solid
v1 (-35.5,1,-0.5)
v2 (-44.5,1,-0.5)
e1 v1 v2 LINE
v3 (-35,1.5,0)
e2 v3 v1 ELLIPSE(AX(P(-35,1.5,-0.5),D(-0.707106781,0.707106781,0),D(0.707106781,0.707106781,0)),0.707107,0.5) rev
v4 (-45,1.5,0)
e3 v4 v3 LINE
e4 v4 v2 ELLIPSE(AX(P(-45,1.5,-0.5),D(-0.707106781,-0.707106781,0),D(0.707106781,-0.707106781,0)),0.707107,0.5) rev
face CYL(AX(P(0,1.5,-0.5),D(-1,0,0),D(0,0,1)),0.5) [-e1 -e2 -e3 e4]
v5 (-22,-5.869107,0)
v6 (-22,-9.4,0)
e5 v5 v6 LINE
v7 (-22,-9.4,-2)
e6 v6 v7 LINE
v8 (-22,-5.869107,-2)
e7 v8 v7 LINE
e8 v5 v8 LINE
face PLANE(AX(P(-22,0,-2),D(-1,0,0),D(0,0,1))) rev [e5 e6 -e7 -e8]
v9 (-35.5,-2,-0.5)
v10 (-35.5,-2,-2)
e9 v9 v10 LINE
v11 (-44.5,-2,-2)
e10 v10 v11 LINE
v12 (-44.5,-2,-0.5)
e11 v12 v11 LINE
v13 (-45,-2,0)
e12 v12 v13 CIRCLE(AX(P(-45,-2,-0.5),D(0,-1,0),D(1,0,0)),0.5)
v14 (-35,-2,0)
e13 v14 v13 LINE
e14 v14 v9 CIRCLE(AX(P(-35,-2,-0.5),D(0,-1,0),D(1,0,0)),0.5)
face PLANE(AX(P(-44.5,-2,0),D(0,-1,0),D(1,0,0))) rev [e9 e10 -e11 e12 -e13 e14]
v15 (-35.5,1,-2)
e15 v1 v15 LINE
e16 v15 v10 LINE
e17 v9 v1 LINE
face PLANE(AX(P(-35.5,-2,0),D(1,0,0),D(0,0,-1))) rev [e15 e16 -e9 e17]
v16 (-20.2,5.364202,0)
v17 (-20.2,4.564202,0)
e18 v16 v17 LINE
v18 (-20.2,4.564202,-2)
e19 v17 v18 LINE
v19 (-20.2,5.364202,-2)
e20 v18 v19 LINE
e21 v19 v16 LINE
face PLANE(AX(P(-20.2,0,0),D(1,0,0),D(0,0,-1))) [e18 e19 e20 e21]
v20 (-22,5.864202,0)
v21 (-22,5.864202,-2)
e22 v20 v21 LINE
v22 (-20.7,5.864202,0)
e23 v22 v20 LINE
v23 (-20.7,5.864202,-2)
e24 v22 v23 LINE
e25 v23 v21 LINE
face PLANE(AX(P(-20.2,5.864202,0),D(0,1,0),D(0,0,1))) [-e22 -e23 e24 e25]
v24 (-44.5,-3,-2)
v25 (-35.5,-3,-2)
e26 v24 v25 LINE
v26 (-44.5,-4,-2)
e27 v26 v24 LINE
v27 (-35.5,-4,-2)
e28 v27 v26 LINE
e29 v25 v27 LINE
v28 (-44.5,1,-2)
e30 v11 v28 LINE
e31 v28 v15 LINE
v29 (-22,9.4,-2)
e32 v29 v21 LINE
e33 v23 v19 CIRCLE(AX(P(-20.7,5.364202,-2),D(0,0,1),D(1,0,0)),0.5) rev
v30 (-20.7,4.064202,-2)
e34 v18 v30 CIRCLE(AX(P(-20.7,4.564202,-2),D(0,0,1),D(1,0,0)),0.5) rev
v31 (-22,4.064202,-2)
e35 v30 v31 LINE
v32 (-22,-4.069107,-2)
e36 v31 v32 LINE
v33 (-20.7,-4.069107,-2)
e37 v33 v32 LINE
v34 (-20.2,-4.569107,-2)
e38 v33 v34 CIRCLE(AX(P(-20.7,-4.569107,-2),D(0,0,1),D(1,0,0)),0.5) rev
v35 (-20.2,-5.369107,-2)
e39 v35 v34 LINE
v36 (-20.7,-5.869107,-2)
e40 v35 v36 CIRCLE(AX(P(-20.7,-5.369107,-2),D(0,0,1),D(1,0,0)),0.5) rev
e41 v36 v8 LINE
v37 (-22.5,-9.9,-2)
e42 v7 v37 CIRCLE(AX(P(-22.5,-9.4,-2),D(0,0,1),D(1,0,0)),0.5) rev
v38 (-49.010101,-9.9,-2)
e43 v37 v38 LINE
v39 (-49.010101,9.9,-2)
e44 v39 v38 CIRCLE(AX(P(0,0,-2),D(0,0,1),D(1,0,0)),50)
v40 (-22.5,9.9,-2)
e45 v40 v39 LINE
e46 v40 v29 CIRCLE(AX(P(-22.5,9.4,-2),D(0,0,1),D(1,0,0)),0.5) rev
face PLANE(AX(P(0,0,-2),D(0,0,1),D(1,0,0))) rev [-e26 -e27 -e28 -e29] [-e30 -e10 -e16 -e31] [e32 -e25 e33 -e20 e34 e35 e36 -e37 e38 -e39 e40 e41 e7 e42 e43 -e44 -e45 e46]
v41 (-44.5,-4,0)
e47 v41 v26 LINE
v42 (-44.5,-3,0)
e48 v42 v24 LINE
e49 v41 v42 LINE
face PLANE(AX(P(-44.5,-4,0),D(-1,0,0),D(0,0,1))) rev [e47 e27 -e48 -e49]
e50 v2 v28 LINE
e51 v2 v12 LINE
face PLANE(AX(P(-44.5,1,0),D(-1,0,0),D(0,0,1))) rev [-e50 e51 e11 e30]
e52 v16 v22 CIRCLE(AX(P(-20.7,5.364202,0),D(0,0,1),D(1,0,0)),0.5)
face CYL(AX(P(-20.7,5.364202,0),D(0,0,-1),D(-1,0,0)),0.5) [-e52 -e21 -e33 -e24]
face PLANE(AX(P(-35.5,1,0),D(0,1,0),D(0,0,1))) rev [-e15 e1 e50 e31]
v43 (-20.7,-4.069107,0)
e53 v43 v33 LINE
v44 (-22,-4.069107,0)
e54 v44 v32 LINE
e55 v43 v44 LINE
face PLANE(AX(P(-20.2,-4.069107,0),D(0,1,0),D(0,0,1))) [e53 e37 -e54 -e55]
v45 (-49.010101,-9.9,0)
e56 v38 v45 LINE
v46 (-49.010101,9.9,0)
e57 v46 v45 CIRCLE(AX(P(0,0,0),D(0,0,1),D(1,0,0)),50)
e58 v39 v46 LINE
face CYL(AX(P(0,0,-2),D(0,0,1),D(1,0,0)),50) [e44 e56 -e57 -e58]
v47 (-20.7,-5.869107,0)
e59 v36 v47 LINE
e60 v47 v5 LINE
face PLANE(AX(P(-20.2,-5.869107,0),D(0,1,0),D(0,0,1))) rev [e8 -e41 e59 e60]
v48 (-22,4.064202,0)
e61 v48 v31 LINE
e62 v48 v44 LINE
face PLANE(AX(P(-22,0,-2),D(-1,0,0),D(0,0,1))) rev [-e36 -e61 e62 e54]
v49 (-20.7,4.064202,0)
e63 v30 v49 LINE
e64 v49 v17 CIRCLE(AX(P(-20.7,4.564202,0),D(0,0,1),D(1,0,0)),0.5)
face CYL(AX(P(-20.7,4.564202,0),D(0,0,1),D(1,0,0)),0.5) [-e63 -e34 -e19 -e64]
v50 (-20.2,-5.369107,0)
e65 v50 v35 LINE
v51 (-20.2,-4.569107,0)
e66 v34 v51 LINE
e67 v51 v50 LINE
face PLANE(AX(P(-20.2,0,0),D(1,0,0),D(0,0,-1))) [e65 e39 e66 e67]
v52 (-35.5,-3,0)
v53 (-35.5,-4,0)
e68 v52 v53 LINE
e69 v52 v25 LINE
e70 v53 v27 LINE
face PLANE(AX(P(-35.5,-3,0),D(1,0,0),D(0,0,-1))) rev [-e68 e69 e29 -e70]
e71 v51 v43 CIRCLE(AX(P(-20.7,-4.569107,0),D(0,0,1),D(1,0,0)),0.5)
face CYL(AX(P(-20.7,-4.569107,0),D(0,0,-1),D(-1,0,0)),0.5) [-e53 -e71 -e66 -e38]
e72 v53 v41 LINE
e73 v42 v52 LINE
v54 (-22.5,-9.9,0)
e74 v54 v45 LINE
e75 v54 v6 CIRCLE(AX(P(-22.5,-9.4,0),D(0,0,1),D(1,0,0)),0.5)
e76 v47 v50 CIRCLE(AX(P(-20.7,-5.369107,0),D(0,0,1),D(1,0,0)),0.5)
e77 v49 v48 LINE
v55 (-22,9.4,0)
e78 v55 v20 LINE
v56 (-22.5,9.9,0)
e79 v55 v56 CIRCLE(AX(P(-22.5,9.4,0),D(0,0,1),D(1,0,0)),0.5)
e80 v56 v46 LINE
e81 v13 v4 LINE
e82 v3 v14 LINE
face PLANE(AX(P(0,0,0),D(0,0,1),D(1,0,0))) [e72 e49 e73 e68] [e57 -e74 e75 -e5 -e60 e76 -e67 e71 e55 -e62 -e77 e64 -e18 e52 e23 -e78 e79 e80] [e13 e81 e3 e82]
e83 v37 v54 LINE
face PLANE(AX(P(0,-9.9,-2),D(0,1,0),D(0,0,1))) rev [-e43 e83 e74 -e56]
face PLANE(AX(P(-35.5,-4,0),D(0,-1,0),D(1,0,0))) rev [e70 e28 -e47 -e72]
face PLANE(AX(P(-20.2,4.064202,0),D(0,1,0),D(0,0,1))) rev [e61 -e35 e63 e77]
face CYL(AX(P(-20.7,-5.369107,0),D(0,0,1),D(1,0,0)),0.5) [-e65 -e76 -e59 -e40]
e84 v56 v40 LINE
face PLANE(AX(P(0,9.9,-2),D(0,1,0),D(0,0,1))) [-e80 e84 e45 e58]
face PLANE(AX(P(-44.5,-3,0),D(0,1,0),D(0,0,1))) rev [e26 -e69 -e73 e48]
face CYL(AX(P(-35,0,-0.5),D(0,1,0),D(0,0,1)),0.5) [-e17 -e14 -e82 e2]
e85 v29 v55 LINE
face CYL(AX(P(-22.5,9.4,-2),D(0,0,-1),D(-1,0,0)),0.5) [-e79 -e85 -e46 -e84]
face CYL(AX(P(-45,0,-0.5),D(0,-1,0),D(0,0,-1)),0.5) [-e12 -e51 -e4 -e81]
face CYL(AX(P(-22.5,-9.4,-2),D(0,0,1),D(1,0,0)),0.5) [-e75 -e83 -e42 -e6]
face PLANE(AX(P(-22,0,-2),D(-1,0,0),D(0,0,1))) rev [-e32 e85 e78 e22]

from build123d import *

# Parameters (mm, degrees)
SKETCH1_R           = 50
BOSS_EXTRUDE1_DEPTH = 2
SKETCH1_3_W         = 9
SKETCH1_3_H         = 4
BOSS_EXTRUDE2_DEPTH = 5
CUT_EXTRUDE1_DEPTH  = 9
SKETCH5_W           = 24
SKETCH5_H           = 2
BOSS_EXTRUDE3_DEPTH = 2.5
CUT_EXTRUDE7_DEPTH  = 2
SKETCH8_W           = 33
SKETCH8_H           = 2
BOSS_EXTRUDE4_DEPTH = 2.5
SKETCH13_W          = 24
SKETCH13_H          = 2.5
CUT_EXTRUDE10_DEPTH = 4
SKETCH1_9_R         = 10
CUT_EXTRUDE17_DEPTH = 2
CHAMFER2_SIZE       = 4.5
CHAMFER2_SIZE_2     = 3.150933922
CUT_EXTRUDE19_DEPTH = 9
SKETCH15_W          = 9
SKETCH15_H          = 3
SKETCH15_H_2        = 1
CUT_EXTRUDE20_DEPTH = 2
BOSS_EXTRUDE6_DEPTH = 1.8
FILLET4_R           = 0.5


with BuildPart() as part:
    # Sketch1 → Boss-Extrude1 (new body)
    with BuildSketch(Plane.XY):
        Circle(SKETCH1_R)
    extrude(amount=-BOSS_EXTRUDE1_DEPTH)

    # Sketch1<3> → Boss-Extrude2 (add)
    with BuildSketch(Plane.XY):
        with Locations((-40, 0)):
            Rectangle(SKETCH1_3_W, SKETCH1_3_H)
    extrude(amount=BOSS_EXTRUDE2_DEPTH)

    # Sketch4 → Cut-Extrude1 (cut)
    with BuildSketch(Plane.ZY.offset(44.5)):
        Polygon((0, 0), (2.5, 0), (2.5, -2), (5, -2), (5, 2), (0, 2), align=None)
        Polygon((0, 0), (0, -2), (2.5, 0), align=None)
    extrude(amount=-CUT_EXTRUDE1_DEPTH, mode=Mode.SUBTRACT)


with BuildPart() as cut_extrude1_piece_1:
    # of the separate pieces the step leaves, piece 1, a body of its own (cut_extrude1_pieces)
    add(part.part.solids().sort_by_distance((50, 0, 0))[0])

    # Sketch5 → Boss-Extrude3 (add)
    with BuildSketch(Plane.XY):
        with Locations((-23.5, -1)):
            Rectangle(SKETCH5_W, SKETCH5_H)
    extrude(amount=BOSS_EXTRUDE3_DEPTH)

    # Sketch1<4> → Cut-Extrude7 (cut)
    with BuildSketch(Plane.XY):
        with BuildLine():
            Line((10, 0), (0, 0))
            Line((0, 0), (-10, 0))
            ThreePointArc((-10, 0), (0, -10), (10, 0))
        make_face()
        with BuildLine():
            Line((-10, 0), (0, 0))
            Line((0, 0), (10, 0))
            ThreePointArc((10, 0), (0, 10), (-10, 0))
        make_face()
        with BuildLine():
            Line((10, 0), (0, 0))
            Line((0, 0), (-10, 0))
            ThreePointArc((-10, 0), (0, -10), (10, 0))
        make_face()
        with BuildLine():
            Line((-10, 0), (0, 0))
            Line((0, 0), (10, 0))
            ThreePointArc((10, 0), (0, 10), (-10, 0))
        make_face()
    extrude(amount=-CUT_EXTRUDE7_DEPTH, mode=Mode.SUBTRACT)



with BuildPart() as cut_extrude1_piece_2:
    # of the separate pieces the step leaves, piece 2, a body of its own (cut_extrude1_pieces)
    add(part.part.solids().sort_by_distance((-44.5, -2, 2.5))[0])


with BuildPart() as cut_extrude1_piece_1_1:
    add(cut_extrude1_piece_1.part)

    add(cut_extrude1_piece_2.part)  # Boss-Extrude4 merges Cut-Extrude1 piece 2
    # Sketch8 → Boss-Extrude4 (add)
    with BuildSketch(Plane.XY):
        with Locations((-28, -3)):
            Rectangle(SKETCH8_W, SKETCH8_H)
    extrude(amount=BOSS_EXTRUDE4_DEPTH)

    # Sketch13 → Cut-Extrude10 (cut)
    with BuildSketch(Plane(origin=(0, 0, 0), x_dir=(1, 0, 0), z_dir=(0, 1, 0))):
        with Locations((-23.5, -1.25)):
            Rectangle(SKETCH13_W, SKETCH13_H)
    extrude(amount=-CUT_EXTRUDE10_DEPTH, mode=Mode.SUBTRACT)

    # Sketch1<9> → Cut-Extrude17 (cut)
    with BuildSketch(Plane.XY):
        with BuildLine():
            Line((-22, 9.9), (-22, -9.9))
            Line((-22, -9.9), (-49.010101, -9.9))
            ThreePointArc((-49.010101, -9.9), (50, 0), (-49.010101, 9.9))
            Line((-49.010101, 9.9), (-22, 9.9))
        make_face()
        Circle(SKETCH1_9_R, mode=Mode.SUBTRACT)
    extrude(amount=-CUT_EXTRUDE17_DEPTH, mode=Mode.SUBTRACT)

    # Chamfer2
    # the kernel refuses this chamfer: 4.5, 3.150933922 mm, written as the material it takes off along each edge
    with BuildSketch(Plane(origin=(-35.5, -9.259884147, -9.074855184), x_dir=(-0.9997533347641299, 0.017342841849466925, -0.013874273479573545), z_dir=(0, 0.6246950475544244, 0.7808688094430303))) as chamfer2_piece_1_section:
        Polygon((CHAMFER2_SIZE * 0.999753334764, CHAMFER2_SIZE * 0.0222096741985), (-CHAMFER2_SIZE_2 * 0.0222096741981, CHAMFER2_SIZE_2 * 0.999753334746), (0, 0), align=None)
    chamfer2_piece_1 = extrude(amount=26.444532191, mode=Mode.PRIVATE)
    chamfer2_piece_1 = split(chamfer2_piece_1, bisect_by=Plane(origin=(-37.088065075, -2.140732647, 0), z_dir=(0, 0, 1)), keep=Keep.TOP, mode=Mode.PRIVATE)
    add(chamfer2_piece_1, mode=Mode.SUBTRACT)

    # Sketch17 → Cut-Extrude19 (cut)
    with BuildSketch(Plane.ZY.offset(44.5)):
        Polygon((0, -4), (2.5, -4), (2.5, 0), (0, -2), align=None)
    extrude(amount=-CUT_EXTRUDE19_DEPTH, mode=Mode.SUBTRACT)

    # Sketch15 → Cut-Extrude20 (cut)
    with BuildSketch(Plane(origin=(0, 0, -2), x_dir=(-1, 0, 0), z_dir=(0, 0, -1))):
        with Locations((40, -0.5)):
            Rectangle(SKETCH15_W, SKETCH15_H)
        with Locations((40, -3.5)):
            Rectangle(SKETCH15_W, SKETCH15_H_2)
    extrude(amount=-CUT_EXTRUDE20_DEPTH, mode=Mode.SUBTRACT)

    # Sketch18 → Boss-Extrude6 (add)
    with BuildSketch(Plane(origin=(-22, 0, 0), x_dir=(0, 0, -1), z_dir=(1, 0, 0))):
        Polygon((0, 4.064201772), (2, 4.064201772), (2, 5.864201772), (1, 5.864201772), (0, 5.864201772), align=None)
        Polygon((2, -5.869107155), (2, -4.069107155), (0, -4.069107155), (0, -5.869107155), (1, -5.869107155), align=None)
    extrude(amount=BOSS_EXTRUDE6_DEPTH)

    # Fillet4
    fillet4_edges = [cut_extrude1_piece_1_1.edges().sort_by_distance(p)[0] for p in [
        (-44.5, -0.5, 0),
        (-35.5, -0.5, 0),
        (-40, 1, 0),
        (-20.2, 5.864201772, -1),
        (-20.2, 4.064201772, -1),
        (-20.2, -4.069107155, -1),
        (-20.2, -5.869107155, -1),
        (-22, -9.9, -1),
        (-22, 9.9, -1),
    ]]
    fillet(fillet4_edges, radius=FILLET4_R)


solid = cut_extrude1_piece_1_1.part
